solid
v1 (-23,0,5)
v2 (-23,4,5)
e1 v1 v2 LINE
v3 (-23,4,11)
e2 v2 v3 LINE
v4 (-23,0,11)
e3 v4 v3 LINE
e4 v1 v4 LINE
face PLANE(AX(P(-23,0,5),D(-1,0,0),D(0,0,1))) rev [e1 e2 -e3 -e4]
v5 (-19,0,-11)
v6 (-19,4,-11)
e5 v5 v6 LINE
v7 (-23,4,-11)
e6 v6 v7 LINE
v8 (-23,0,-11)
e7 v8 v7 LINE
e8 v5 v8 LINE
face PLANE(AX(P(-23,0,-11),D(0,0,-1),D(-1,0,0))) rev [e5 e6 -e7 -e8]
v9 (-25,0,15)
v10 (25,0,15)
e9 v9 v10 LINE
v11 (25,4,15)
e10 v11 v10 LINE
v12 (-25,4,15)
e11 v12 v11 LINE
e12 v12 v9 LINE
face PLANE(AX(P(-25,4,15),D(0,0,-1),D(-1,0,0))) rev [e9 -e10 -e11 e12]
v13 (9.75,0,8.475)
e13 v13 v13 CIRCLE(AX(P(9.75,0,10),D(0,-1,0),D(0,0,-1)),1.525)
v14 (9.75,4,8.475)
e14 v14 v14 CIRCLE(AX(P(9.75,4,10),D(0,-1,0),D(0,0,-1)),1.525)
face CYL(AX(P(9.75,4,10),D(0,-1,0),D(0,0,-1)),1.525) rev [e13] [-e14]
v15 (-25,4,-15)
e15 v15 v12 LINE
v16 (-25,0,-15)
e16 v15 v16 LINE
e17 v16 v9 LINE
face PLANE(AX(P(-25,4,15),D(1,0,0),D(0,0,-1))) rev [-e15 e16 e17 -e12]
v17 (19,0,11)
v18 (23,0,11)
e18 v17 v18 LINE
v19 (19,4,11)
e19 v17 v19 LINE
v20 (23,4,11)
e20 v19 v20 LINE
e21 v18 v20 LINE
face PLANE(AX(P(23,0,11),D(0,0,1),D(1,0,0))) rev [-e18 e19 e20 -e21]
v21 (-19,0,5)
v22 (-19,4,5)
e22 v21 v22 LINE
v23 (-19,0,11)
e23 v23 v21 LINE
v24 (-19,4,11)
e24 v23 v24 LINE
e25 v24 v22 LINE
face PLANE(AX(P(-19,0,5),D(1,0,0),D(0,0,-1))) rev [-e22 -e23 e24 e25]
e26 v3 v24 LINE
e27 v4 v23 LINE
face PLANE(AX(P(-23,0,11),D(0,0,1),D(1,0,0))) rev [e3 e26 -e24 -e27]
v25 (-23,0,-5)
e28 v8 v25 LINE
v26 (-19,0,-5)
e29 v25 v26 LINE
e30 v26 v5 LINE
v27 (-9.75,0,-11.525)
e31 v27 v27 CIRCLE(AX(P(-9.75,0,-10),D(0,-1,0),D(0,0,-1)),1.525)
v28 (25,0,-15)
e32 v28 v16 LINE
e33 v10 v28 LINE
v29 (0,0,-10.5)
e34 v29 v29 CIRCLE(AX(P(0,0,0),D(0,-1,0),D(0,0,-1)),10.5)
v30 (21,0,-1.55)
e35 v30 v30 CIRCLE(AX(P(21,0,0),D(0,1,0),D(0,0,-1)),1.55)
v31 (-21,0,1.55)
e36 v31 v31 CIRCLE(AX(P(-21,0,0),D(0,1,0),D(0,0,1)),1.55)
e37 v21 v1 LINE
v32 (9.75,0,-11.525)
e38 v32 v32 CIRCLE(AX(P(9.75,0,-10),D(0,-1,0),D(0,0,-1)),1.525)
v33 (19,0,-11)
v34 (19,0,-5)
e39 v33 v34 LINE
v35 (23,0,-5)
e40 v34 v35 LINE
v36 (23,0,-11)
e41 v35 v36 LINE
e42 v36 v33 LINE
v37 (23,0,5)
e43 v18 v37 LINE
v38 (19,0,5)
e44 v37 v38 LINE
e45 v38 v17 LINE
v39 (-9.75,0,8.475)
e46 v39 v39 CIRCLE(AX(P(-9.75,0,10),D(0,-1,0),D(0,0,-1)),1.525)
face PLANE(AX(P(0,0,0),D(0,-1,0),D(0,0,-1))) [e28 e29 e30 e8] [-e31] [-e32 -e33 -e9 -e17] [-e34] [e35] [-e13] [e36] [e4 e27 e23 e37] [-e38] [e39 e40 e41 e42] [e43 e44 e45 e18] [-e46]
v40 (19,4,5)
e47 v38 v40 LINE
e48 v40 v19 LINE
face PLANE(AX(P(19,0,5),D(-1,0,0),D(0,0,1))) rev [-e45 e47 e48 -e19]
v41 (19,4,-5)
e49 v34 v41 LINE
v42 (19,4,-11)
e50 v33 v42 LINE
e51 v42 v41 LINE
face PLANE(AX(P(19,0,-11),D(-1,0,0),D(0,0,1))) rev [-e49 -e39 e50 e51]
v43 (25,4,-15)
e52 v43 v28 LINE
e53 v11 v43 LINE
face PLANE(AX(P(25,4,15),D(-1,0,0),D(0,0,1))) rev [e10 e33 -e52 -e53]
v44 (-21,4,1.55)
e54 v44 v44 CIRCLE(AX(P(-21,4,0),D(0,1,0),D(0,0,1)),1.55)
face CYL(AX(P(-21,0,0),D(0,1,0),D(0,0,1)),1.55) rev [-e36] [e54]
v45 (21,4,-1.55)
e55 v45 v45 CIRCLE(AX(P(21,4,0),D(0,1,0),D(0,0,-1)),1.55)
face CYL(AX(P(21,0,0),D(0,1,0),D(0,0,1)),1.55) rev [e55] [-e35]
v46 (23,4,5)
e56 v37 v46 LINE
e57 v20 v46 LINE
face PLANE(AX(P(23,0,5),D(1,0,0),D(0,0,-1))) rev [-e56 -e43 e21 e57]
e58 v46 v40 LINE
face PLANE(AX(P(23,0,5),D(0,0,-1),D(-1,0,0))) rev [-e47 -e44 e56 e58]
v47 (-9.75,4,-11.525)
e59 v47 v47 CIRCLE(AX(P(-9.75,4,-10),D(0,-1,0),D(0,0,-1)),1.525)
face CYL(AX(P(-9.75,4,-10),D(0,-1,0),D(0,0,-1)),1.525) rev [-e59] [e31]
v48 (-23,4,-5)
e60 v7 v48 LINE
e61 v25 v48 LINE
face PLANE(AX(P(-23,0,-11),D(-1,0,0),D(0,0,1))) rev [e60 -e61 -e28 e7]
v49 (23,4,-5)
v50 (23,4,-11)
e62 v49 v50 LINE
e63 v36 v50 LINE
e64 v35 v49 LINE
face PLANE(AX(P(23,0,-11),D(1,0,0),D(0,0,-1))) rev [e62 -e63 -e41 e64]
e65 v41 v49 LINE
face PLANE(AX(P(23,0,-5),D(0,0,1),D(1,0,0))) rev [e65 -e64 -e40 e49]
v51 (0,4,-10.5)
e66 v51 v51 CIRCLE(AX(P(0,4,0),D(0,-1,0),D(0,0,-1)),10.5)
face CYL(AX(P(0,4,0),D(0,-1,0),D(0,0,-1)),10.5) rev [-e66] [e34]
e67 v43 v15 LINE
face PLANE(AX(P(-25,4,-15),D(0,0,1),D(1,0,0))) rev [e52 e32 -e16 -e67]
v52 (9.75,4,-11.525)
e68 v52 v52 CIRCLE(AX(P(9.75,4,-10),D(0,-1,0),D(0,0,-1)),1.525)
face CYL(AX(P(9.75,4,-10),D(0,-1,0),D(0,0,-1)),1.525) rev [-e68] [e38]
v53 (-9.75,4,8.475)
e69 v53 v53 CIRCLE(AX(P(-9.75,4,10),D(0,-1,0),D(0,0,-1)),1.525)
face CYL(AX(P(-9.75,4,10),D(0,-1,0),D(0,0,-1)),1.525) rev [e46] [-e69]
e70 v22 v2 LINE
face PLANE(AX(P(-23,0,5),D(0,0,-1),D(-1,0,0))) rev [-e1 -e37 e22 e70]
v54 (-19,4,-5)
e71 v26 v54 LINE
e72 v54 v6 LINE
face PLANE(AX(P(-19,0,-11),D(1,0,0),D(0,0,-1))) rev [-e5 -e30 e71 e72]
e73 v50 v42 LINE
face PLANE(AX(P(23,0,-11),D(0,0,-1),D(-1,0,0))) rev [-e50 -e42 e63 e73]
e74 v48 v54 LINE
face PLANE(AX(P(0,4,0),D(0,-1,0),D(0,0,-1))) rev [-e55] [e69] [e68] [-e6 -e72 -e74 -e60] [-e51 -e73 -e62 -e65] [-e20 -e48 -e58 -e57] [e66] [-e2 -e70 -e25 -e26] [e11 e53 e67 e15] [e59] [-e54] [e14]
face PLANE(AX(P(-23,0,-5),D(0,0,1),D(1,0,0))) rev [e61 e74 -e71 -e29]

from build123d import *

# Parameters (mm, degrees)
CROQUIS1_W              = 50
CROQUIS1_H              = 30
SALIENTE_EXTRUIR1_DEPTH = 4
CROQUIS2_W              = 4
CROQUIS2_H              = 6
CORTAR_EXTRUIR1_DEPTH   = 30.427877939
CROQUIS3_R              = 1.55
CORTAR_EXTRUIR2_DEPTH   = 30.427877939
CROQUIS4_R              = 10.5
CROQUIS4_R_2            = 1.525
CORTAR_EXTRUIR3_DEPTH   = 30.427877939


with BuildPart() as part:
    # Croquis1 → Saliente-Extruir1 (new body)
    with BuildSketch(Plane(origin=(0, 0, 0), x_dir=(1, 0, 0), z_dir=(0, 1, 0))):
        Rectangle(CROQUIS1_W, CROQUIS1_H)
    extrude(amount=SALIENTE_EXTRUIR1_DEPTH)

    # Croquis2 → Cortar-Extruir1 (cut, through all)
    with BuildSketch(Plane(origin=(0, 4, 0), x_dir=(1, 0, 0), z_dir=(0, 1, 0))):
        with Locations((-21, 8)):
            Rectangle(CROQUIS2_W, CROQUIS2_H)
        with Locations((-21, -8)):
            Rectangle(CROQUIS2_W, CROQUIS2_H)
        with Locations((21, -8)):
            Rectangle(CROQUIS2_W, CROQUIS2_H)
        with Locations((21, 8)):
            Rectangle(CROQUIS2_W, CROQUIS2_H)
    extrude(amount=-CORTAR_EXTRUIR1_DEPTH, mode=Mode.SUBTRACT)

    # Croquis3 → Cortar-Extruir2 (cut, through all)
    with BuildSketch(Plane(origin=(0, 4, 0), x_dir=(1, 0, 0), z_dir=(0, 1, 0))):
        with Locations((-21, 0)):
            Circle(CROQUIS3_R)
        with Locations((21, 0)):
            Circle(CROQUIS3_R)
    extrude(amount=-CORTAR_EXTRUIR2_DEPTH, mode=Mode.SUBTRACT)

    # Croquis4 → Cortar-Extruir3 (cut, through all)
    with BuildSketch(Plane.XZ):
        Circle(CROQUIS4_R)
        with Locations((-9.75, 10)):
            Circle(CROQUIS4_R_2)
        with Locations((-9.75, -10)):
            Circle(CROQUIS4_R_2)
        with Locations((9.75, -10)):
            Circle(CROQUIS4_R_2)
        with Locations((9.75, 10)):
            Circle(CROQUIS4_R_2)
    extrude(amount=-CORTAR_EXTRUIR3_DEPTH, mode=Mode.SUBTRACT)


solid = part.part
